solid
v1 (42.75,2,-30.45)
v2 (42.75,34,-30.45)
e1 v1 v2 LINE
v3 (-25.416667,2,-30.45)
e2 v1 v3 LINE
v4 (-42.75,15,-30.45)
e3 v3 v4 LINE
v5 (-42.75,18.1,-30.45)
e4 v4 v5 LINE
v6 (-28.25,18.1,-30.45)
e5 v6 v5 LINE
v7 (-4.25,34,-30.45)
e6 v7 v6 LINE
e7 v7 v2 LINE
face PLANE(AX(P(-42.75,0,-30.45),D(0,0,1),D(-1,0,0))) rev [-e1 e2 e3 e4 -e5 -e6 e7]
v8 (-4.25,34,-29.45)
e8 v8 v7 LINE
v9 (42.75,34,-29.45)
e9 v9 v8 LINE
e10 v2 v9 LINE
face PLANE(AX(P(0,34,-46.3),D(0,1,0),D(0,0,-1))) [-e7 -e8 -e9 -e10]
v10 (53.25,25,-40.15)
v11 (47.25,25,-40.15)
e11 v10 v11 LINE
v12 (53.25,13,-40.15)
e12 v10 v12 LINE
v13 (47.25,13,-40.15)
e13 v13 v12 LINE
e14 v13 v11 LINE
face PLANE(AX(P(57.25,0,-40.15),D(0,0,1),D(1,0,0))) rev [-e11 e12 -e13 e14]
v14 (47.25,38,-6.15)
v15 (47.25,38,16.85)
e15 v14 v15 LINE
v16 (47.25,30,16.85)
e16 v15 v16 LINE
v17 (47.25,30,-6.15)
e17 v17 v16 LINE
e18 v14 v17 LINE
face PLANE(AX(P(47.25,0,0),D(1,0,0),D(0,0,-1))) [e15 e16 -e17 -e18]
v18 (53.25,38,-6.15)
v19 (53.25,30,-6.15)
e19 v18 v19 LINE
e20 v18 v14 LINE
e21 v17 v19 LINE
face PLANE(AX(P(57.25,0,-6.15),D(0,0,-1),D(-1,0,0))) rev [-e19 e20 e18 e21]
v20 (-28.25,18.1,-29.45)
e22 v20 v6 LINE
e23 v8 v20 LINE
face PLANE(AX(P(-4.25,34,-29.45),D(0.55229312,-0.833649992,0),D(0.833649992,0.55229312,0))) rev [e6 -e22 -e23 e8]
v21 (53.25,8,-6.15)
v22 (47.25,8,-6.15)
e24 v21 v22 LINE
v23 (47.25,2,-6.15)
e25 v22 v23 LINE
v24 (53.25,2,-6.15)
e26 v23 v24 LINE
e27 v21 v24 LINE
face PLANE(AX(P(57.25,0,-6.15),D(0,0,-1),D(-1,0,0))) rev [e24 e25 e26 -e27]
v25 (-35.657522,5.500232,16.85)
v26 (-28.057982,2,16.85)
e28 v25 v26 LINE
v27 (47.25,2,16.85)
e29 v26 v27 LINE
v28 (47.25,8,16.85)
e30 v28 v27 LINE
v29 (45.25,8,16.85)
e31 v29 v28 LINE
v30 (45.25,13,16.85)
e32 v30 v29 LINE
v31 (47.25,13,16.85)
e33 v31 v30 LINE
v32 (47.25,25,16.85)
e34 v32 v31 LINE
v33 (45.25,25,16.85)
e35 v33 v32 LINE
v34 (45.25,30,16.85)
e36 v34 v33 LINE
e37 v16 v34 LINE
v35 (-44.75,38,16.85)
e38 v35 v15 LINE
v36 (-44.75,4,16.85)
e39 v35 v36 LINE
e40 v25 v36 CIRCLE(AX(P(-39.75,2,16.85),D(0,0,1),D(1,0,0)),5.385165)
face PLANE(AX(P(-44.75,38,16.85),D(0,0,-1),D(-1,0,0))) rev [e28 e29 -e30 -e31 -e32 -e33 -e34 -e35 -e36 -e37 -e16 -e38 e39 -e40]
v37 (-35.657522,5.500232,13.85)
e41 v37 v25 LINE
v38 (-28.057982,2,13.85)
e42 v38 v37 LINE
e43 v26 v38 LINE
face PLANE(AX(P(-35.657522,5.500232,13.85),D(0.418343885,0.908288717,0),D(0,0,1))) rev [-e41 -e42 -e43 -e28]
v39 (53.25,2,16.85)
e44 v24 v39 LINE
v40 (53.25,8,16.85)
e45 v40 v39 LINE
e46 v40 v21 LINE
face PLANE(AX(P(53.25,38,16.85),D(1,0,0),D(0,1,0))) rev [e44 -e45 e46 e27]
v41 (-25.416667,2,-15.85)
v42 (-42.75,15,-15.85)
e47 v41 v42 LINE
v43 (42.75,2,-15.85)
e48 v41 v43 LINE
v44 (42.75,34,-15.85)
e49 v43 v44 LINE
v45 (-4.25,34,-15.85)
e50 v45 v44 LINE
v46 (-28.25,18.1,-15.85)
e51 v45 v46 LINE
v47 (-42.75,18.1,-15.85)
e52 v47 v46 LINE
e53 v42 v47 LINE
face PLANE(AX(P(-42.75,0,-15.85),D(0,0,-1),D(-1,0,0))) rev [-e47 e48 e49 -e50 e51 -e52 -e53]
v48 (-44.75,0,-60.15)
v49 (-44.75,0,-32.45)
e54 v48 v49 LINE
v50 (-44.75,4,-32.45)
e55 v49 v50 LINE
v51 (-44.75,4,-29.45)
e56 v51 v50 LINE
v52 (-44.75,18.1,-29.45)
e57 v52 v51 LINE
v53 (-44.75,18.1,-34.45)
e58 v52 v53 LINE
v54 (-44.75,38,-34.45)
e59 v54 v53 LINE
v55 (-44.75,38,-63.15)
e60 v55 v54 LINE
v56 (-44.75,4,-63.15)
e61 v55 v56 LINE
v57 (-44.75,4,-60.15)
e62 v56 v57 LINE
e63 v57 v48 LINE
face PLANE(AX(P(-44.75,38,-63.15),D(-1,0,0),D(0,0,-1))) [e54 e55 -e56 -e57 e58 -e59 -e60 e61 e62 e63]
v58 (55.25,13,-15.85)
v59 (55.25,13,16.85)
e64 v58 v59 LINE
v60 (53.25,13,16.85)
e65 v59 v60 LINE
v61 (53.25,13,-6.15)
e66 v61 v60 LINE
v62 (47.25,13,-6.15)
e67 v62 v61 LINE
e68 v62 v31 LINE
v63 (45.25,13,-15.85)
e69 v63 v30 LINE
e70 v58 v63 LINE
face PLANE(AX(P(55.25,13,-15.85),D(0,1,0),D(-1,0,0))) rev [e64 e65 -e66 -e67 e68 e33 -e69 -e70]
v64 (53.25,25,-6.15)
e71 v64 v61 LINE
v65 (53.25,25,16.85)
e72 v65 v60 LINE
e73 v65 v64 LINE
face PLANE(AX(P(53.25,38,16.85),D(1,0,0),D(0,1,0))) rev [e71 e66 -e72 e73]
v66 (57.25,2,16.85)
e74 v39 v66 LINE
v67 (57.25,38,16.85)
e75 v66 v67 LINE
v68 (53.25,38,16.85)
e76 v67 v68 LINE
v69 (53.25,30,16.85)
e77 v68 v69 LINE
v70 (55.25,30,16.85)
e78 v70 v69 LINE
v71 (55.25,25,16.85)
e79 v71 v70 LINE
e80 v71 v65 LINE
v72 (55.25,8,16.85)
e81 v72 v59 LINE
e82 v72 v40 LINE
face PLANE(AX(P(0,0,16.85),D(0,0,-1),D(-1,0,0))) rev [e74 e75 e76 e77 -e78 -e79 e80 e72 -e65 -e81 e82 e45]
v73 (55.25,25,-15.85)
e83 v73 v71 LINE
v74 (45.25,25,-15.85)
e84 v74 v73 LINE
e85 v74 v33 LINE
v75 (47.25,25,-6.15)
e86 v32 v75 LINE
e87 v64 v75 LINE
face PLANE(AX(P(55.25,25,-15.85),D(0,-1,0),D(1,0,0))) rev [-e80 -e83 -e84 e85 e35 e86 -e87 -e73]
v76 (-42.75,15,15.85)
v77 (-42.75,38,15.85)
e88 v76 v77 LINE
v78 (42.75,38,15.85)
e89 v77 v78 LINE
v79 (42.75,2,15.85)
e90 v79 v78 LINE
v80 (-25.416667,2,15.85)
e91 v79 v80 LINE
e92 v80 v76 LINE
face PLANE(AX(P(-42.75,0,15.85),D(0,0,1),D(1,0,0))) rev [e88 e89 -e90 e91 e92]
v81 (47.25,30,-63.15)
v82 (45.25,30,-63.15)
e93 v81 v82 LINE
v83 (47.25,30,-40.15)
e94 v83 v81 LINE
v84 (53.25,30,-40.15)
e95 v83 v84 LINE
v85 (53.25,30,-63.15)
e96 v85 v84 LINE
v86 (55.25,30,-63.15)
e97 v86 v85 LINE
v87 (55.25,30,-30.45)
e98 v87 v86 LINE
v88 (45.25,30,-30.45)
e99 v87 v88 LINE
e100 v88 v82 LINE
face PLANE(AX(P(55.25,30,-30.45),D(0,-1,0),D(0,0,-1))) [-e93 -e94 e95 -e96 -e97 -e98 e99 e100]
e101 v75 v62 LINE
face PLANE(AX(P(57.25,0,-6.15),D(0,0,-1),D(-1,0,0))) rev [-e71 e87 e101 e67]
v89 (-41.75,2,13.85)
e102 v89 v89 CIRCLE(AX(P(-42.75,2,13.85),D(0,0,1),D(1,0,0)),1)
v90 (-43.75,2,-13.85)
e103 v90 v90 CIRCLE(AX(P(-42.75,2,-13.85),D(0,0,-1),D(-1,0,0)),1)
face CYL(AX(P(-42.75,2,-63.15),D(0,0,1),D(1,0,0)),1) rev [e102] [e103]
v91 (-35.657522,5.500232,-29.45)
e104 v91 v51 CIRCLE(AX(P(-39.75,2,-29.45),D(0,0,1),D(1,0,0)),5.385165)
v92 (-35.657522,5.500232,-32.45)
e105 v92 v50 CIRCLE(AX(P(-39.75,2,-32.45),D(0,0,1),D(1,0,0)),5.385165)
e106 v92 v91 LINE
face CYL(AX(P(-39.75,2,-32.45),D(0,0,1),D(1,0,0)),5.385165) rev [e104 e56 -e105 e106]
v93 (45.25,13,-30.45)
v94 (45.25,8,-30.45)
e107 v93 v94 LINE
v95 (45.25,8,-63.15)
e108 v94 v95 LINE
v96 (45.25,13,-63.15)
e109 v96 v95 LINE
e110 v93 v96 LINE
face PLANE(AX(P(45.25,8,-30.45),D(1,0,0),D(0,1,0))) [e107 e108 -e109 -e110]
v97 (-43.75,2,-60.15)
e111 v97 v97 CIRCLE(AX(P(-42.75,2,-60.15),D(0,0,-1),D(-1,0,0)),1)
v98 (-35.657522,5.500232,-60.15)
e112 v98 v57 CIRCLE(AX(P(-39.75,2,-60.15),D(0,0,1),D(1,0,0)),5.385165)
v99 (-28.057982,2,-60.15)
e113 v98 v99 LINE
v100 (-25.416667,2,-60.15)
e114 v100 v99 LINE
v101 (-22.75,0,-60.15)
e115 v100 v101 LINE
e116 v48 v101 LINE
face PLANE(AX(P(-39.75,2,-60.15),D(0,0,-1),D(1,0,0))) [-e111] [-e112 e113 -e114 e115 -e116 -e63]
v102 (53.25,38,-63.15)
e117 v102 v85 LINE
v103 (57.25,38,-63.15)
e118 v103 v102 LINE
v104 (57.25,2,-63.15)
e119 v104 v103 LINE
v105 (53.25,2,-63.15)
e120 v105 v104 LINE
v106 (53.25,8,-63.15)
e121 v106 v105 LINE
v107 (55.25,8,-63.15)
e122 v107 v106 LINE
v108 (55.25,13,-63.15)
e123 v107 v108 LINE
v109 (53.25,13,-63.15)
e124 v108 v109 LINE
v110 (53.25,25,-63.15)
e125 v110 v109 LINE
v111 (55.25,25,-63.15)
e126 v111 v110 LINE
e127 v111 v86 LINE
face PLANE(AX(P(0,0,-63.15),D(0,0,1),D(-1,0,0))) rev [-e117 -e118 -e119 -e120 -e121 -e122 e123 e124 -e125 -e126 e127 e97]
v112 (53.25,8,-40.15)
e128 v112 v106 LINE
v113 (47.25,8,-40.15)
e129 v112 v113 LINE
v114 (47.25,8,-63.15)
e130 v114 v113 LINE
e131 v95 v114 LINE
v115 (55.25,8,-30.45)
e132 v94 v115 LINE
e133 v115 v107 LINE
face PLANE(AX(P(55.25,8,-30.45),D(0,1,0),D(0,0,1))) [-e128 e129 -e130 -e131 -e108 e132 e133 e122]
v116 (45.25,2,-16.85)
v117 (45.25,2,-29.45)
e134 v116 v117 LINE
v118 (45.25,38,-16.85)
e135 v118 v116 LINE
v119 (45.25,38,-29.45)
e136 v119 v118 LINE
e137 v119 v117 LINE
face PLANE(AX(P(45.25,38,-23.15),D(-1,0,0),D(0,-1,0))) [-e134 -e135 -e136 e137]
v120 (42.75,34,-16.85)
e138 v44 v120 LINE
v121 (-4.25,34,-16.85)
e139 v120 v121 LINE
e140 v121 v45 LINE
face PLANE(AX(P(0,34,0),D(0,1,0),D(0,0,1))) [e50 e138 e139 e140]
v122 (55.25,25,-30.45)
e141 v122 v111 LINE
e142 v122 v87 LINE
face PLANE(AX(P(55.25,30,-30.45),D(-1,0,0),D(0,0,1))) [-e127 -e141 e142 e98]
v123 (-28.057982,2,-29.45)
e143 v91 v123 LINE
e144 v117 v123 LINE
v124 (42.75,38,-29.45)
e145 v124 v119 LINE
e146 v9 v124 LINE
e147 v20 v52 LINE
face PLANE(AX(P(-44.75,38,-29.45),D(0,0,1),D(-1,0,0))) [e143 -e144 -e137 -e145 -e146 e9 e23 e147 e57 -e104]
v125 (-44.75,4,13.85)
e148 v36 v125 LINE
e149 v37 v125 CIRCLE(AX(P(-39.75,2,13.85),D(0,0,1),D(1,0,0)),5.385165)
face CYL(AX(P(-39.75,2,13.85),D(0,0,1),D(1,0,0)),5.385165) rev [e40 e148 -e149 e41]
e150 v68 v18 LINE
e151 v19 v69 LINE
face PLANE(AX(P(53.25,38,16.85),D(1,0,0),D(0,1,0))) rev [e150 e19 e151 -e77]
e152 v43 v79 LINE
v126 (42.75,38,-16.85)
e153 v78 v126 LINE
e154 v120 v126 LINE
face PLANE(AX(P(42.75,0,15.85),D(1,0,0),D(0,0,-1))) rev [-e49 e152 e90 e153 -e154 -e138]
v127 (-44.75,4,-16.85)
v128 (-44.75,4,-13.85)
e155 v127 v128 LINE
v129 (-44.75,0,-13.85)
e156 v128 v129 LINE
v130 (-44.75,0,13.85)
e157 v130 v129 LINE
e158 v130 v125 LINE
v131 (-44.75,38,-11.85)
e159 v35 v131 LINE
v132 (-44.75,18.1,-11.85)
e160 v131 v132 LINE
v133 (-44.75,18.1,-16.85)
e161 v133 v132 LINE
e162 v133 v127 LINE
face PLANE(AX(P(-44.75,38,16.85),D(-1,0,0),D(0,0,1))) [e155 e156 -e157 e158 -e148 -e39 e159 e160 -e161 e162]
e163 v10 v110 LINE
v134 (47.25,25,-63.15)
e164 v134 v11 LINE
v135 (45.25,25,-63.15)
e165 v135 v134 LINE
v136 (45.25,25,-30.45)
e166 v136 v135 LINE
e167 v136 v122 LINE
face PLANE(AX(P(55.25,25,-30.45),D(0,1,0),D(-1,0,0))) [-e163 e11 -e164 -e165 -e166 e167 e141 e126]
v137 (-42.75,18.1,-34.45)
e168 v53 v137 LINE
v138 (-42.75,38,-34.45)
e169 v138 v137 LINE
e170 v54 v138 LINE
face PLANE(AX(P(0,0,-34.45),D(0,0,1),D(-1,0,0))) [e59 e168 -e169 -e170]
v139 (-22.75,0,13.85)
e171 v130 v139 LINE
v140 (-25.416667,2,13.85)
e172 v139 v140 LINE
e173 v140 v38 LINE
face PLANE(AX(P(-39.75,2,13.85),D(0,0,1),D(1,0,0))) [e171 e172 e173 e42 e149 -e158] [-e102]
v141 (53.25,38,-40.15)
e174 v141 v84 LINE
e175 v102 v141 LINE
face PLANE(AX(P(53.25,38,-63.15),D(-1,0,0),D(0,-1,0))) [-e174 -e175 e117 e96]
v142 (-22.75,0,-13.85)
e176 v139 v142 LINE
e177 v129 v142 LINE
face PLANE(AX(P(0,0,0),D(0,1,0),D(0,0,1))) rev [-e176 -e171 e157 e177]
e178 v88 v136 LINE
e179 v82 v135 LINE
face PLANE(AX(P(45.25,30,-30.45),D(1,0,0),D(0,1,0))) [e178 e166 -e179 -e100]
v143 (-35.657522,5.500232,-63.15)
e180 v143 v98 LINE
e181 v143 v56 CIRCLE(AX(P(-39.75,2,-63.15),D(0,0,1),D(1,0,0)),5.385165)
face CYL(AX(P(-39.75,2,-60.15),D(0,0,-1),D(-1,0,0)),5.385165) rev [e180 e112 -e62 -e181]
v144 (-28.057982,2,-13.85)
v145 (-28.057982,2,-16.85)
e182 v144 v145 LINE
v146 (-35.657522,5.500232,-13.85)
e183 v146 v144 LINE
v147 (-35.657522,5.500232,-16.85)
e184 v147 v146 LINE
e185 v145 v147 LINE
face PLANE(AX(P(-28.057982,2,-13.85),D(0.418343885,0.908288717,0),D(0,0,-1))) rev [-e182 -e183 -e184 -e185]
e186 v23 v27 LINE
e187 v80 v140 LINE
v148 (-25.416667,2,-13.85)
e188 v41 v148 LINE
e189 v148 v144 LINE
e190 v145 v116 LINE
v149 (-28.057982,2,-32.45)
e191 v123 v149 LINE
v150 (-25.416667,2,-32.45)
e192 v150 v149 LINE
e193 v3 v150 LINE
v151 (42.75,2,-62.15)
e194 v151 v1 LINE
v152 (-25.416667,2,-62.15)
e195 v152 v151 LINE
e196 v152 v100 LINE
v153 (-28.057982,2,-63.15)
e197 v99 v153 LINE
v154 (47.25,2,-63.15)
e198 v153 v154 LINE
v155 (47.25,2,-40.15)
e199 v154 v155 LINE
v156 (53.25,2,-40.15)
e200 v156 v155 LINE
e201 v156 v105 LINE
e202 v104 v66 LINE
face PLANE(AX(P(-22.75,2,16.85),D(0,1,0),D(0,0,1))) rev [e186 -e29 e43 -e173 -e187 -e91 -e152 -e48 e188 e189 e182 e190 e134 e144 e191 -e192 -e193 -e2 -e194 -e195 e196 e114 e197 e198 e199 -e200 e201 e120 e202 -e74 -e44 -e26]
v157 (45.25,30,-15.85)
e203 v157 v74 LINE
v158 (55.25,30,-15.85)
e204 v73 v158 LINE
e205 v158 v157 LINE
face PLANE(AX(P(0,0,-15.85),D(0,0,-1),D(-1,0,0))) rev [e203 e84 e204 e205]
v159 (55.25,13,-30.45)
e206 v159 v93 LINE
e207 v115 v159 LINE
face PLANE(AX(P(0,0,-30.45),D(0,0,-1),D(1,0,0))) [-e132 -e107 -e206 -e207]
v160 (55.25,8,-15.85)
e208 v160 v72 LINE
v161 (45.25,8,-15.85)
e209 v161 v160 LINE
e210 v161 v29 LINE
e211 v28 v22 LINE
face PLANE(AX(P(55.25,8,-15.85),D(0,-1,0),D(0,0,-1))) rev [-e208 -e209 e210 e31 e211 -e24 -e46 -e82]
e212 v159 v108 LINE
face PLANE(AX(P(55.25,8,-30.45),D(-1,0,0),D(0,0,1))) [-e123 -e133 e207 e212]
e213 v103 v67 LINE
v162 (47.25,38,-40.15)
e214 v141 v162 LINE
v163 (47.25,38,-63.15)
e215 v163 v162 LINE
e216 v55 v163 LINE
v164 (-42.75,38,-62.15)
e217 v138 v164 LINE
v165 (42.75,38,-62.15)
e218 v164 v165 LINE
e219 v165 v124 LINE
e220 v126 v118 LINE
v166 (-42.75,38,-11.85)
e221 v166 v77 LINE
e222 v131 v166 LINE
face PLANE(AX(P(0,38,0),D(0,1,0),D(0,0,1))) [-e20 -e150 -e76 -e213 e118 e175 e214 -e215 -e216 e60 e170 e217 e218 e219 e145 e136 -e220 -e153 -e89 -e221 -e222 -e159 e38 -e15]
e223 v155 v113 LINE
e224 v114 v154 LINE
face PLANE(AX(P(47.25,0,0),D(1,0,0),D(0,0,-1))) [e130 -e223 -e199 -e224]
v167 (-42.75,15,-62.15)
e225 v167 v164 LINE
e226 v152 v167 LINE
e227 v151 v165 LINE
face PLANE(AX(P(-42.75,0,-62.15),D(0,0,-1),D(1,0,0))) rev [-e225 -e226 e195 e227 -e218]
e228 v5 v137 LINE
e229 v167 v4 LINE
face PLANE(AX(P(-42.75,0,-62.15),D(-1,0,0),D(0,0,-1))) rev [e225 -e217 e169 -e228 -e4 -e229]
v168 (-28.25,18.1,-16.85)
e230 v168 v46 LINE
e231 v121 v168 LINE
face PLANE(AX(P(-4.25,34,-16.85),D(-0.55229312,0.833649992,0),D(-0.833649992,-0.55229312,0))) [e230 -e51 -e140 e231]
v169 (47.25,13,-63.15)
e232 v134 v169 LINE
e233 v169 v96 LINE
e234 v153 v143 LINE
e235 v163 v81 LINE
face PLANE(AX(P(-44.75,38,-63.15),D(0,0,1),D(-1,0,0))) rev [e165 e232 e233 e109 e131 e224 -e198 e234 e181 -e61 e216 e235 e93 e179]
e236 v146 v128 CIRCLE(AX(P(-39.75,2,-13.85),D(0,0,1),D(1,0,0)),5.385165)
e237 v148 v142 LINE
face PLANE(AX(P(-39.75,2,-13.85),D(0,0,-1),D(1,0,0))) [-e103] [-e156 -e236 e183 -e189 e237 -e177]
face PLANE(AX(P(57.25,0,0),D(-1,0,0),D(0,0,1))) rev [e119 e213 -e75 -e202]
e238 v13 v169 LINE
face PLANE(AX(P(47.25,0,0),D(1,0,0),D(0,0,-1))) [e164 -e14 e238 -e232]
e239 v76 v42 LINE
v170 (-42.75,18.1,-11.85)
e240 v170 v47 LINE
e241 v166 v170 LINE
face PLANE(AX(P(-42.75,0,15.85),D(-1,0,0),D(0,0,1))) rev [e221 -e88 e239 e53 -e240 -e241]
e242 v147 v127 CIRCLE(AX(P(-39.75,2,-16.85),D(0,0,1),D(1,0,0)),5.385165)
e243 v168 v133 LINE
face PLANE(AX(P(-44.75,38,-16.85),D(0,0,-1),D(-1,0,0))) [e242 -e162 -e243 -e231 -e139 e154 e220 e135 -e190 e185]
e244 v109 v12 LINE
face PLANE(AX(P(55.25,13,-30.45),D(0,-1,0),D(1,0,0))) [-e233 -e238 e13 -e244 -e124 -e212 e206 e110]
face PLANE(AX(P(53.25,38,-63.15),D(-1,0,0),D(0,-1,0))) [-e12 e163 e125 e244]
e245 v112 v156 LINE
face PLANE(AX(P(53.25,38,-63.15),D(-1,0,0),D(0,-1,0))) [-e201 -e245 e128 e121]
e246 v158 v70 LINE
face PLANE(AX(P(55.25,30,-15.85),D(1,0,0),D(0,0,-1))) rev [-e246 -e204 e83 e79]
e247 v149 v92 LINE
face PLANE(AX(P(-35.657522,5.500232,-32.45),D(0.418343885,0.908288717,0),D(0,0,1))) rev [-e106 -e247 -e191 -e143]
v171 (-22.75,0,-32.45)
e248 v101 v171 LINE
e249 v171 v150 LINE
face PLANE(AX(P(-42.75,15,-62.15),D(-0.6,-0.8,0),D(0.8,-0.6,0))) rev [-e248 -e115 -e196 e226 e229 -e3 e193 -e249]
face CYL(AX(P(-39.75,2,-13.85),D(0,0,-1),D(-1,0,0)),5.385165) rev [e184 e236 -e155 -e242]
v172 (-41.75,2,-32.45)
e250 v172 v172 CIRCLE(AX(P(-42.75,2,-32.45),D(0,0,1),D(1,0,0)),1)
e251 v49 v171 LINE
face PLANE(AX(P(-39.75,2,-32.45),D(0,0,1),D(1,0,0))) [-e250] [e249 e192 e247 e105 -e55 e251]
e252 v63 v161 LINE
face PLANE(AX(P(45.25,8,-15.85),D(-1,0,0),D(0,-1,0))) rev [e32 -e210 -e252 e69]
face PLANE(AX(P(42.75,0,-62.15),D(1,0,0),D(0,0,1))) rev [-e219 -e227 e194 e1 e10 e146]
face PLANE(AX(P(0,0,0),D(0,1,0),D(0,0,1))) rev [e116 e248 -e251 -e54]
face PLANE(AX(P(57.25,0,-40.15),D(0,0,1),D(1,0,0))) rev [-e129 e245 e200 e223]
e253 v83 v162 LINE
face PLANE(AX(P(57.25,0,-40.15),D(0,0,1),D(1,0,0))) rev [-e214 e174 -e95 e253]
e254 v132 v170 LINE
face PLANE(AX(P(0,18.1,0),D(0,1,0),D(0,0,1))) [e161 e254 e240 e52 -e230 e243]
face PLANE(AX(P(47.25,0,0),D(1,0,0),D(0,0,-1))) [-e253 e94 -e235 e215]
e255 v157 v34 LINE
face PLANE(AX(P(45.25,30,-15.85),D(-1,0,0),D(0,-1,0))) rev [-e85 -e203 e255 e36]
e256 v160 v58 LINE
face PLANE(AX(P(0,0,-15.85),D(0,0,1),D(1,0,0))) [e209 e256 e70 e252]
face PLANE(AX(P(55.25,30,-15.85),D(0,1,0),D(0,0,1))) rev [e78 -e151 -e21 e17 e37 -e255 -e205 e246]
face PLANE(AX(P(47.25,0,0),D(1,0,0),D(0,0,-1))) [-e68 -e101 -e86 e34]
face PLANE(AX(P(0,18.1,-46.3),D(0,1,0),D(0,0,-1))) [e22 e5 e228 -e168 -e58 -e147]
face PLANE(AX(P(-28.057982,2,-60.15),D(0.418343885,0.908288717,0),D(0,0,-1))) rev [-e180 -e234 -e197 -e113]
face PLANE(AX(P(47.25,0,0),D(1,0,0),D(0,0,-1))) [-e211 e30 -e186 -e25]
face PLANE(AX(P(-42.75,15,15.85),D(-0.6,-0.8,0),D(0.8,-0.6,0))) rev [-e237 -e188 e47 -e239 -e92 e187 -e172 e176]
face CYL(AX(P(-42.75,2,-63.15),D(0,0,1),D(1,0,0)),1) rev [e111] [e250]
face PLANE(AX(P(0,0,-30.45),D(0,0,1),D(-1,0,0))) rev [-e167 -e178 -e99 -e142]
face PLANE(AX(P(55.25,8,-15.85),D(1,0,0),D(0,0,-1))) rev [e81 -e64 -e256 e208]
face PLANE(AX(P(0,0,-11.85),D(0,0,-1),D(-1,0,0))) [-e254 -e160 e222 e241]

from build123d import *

# Parameters (mm, degrees)
SKETCH2_W            = 89.5
SKETCH2_H            = 33.7
BOSS_EXTRUDE1_DEPTH  = 38
SKETCH3_W            = 85.5
SKETCH3_H            = 31.7
CUT_EXTRUDE1_DEPTH   = 38
BOSS_EXTRUDE2_DEPTH  = 31.7
SKETCH5_W            = 33.7
SKETCH5_H            = 38
BOSS_EXTRUDE3_DEPTH  = 2.5
SKETCH6_W            = 2
SKETCH6_H            = 38
BOSS_EXTRUDE4_DEPTH  = 6.3
SKETCH7_W            = 34
SKETCH7_H            = 38
BOSS_EXTRUDE5_DEPTH  = 10
SKETCH8_W            = 4
SKETCH8_H            = 38
BOSS_EXTRUDE6_DEPTH  = 23
CUT_EXTRUDE2_START   = -32.7
SKETCH9_W            = 10
SKETCH9_H            = 5
CUT_EXTRUDE2_DEPTH   = 32.7
SKETCH11_W           = 80
SKETCH11_H           = 2
CUT_EXTRUDE3_DEPTH   = 80
CUT_EXTRUDE4_DEPTH   = 3
MIRROR4_COPY_1_DEPTH = 3
CUT_EXTRUDE5_START   = -74
SKETCH13_R           = 1
CUT_EXTRUDE5_DEPTH   = 74
SKETCH15_W           = 47
SKETCH15_H           = 1
CUT_EXTRUDE6_DEPTH   = 4
SKETCH16_W           = 40.5
SKETCH16_H           = 2
CUT_EXTRUDE7_DEPTH   = 19.9
SKETCH17_W           = 2
SKETCH17_H           = 19.9
CUT_EXTRUDE8_DEPTH   = 3
BOSS_EXTRUDE7_START  = -1
BOSS_EXTRUDE7_DEPTH  = 1


with BuildPart() as part:
    # Sketch2 → Boss-Extrude1 (new body)
    with BuildSketch(Plane(origin=(0, 0, 0), x_dir=(1, 0, 0), z_dir=(0, 1, 0))):
        Rectangle(SKETCH2_W, SKETCH2_H)
    extrude(amount=BOSS_EXTRUDE1_DEPTH)

    # Sketch3 → Cut-Extrude1 (cut)
    with BuildSketch(Plane(origin=(0, 38, 0), x_dir=(1, 0, 0), z_dir=(0, 1, 0))):
        Rectangle(SKETCH3_W, SKETCH3_H)
    extrude(amount=-CUT_EXTRUDE1_DEPTH, mode=Mode.SUBTRACT)

    # Sketch4 → Boss-Extrude2 (add)
    with BuildSketch(Plane.XY.offset(-15.85)):
        Polygon((-42.75, 0), (-42.75, 15), (-22.75, 0), align=None)
    extrude(amount=BOSS_EXTRUDE2_DEPTH)

    # Sketch5 → Boss-Extrude3 (add)
    with BuildSketch(Plane(origin=(44.75, 0, 0), x_dir=(0, 0, -1), z_dir=(1, 0, 0))):
        with Locations((0, 19)):
            Rectangle(SKETCH5_W, SKETCH5_H)
    extrude(amount=BOSS_EXTRUDE3_DEPTH)

    # Sketch6 → Boss-Extrude4 (add)
    with BuildSketch(Plane(origin=(0, 0, -16.85), x_dir=(-1, 0, 0), z_dir=(0, 0, -1))):
        with Locations((-46.25, 19)):
            Rectangle(SKETCH6_W, SKETCH6_H)
    extrude(amount=BOSS_EXTRUDE4_DEPTH)

    # Mirror1: part across plane


with BuildPart() as part_1:
    add(part.part)
    add(part.part.mirror(Plane(origin=(0, 0, -23.15), x_dir=(1, 0, 0), z_dir=(0, 0, -1))))

    # Sketch7 → Boss-Extrude5 (add)
    with BuildSketch(Plane(origin=(47.25, 0, 0), x_dir=(0, 0, -1), z_dir=(1, 0, 0))):
        with Locations((23.15, 19)):
            Rectangle(SKETCH7_W, SKETCH7_H)
    extrude(amount=BOSS_EXTRUDE5_DEPTH)

    # Sketch8 → Boss-Extrude6 (add)
    with BuildSketch(Plane.XY.offset(-6.15)):
        with Locations((55.25, 19)):
            Rectangle(SKETCH8_W, SKETCH8_H)
    boss_extrude6 = extrude(amount=BOSS_EXTRUDE6_DEPTH)

    # Sketch9 → Cut-Extrude2 (cut)
    with BuildSketch(Plane.XY.offset(16.85).offset(CUT_EXTRUDE2_START)):
        with Locations((50.25, 27.5)):
            Rectangle(SKETCH9_W, SKETCH9_H)
        with Locations((50.25, 10.5)):
            Rectangle(SKETCH9_W, SKETCH9_H)
    cut_extrude2 = extrude(amount=CUT_EXTRUDE2_DEPTH, mode=Mode.SUBTRACT)

    # Mirror2: Boss-Extrude6, Cut-Extrude2 across plane
    add(boss_extrude6.mirror(Plane(origin=(0, 0, -23.15), x_dir=(1, 0, 0), z_dir=(0, 0, -1))))
    add(cut_extrude2.mirror(Plane(origin=(0, 0, -23.15), x_dir=(1, 0, 0), z_dir=(0, 0, -1))), mode=Mode.SUBTRACT)

    # Sketch11 → Cut-Extrude3 (cut)
    with BuildSketch(Plane(origin=(57.25, 0, 0), x_dir=(0, 0, -1), z_dir=(1, 0, 0))):
        with Locations((23.15, 1)):
            Rectangle(SKETCH11_W, SKETCH11_H)
    extrude(amount=-CUT_EXTRUDE3_DEPTH, mode=Mode.SUBTRACT)

    # Sketch12 → Cut-Extrude4 (cut)
    with BuildSketch(Plane.XY.offset(16.85)):
        with BuildLine():
            Line((-22.75, 2), (-34.364835193, 2))
            ThreePointArc((-34.364835193, 2), (-40.768375168, 7.287996976), (-44.75, 0))
            Line((-44.75, 0), (-22.75, 0))
            Line((-22.75, 0), (-22.75, 2))
        make_face()
    cut_extrude4 = extrude(amount=-CUT_EXTRUDE4_DEPTH, mode=Mode.SUBTRACT)

    # Mirror3: Cut-Extrude4 across plane
    add(cut_extrude4.mirror(Plane.XY), mode=Mode.SUBTRACT)

    # Mirror4: Cut-Extrude4 across plane
    add(cut_extrude4.mirror(Plane(origin=(0, 0, -23.15), x_dir=(1, 0, 0), z_dir=(0, 0, -1))), mode=Mode.SUBTRACT)

    # Mirror4 copy 1 sketch → Mirror4 copy 1 (cut)
    with BuildSketch(Plane.XY.offset(-29.45)):
        with BuildLine():
            Line((-22.75, 2), (-34.364835193, 2))
            ThreePointArc((-34.364835193, 2), (-40.768375168, 7.287996976), (-44.75, 0))
            Line((-44.75, 0), (-22.75, 0))
            Line((-22.75, 0), (-22.75, 2))
        make_face()
    extrude(amount=-MIRROR4_COPY_1_DEPTH, mode=Mode.SUBTRACT)

    # Sketch13 → Cut-Extrude5 (cut)
    with BuildSketch(Plane.XY.offset(13.85).offset(CUT_EXTRUDE5_START)):
        with Locations((-42.75, 2)):
            Circle(SKETCH13_R)
    extrude(amount=CUT_EXTRUDE5_DEPTH, mode=Mode.SUBTRACT)

    # Chamfer1
    # the kernel refuses this chamfer: 10 mm, written as the material it takes off along each edge
    with BuildSketch(Plane(origin=(-34.364835193, 2, 33.530669666), x_dir=(-0.4115208033655663, 0.9114003666870882, 0), z_dir=(0, 0, -1))) as chamfer1_piece_1:
        with BuildLine():
            Line((4.024103798, 0), (-2.897424879, 6.010331734))
            Line((-2.897424879, 6.010331734), (-3.079704953, 5.928027573))
            ThreePointArc((-3.079704953, 5.928027573), (-1.554736759, 2.957293148), (-0.182280073, -0.082304161))
            Line((-0.182280073, -0.082304161), (0.082304161, -0.182280073))
            ThreePointArc((0.082304161, -0.182280073), (2.000716354, 0.27264804), (3.968173362, -0.192020276))
            Line((3.968173362, -0.192020276), (4.024103798, 0))
        make_face()
    extrude(amount=19.680669666, mode=Mode.SUBTRACT)

    # Chamfer2
    # the kernel refuses this chamfer: 10 mm, written as the material it takes off along each edge
    with BuildSketch(Plane(origin=(-34.364835193, 2, -33.530669666), x_dir=(0.9996854583228201, -0.025079561756403367, 0), z_dir=(0, 0, 1))) as chamfer2_piece_1_section:
        with BuildLine():
            Line((6.304869905, 0.158173126), (-1.380064624, 3.466711132))
            ThreePointArc((-1.380064624, 3.466711132), (-0.439598609, 1.999919309), (0, 0))
            Line((0, 0), (6.304869905, 0.158173126))
        make_face()
    chamfer2_piece_1 = extrude(amount=19.680669666, mode=Mode.PRIVATE)
    chamfer2_piece_1 = split(chamfer2_piece_1, bisect_by=Plane(origin=(-32.514060805, 3.115216655, -29.45), z_dir=(0, 0, 1)), keep=Keep.TOP, mode=Mode.PRIVATE)
    add(chamfer2_piece_1, mode=Mode.SUBTRACT)

    # Chamfer3
    # the kernel refuses this chamfer: 10 mm, written as the material it takes off along each edge
    with BuildSketch(Plane(origin=(-34.364835193, 2, -12.769330334), x_dir=(-0.4115208033655663, 0.9114003666870882, 0), z_dir=(0, 0, -1))) as chamfer3_piece_1_section:
        with BuildLine():
            Line((4.024103798, 0), (-2.897424879, 6.010331734))
            Line((-2.897424879, 6.010331734), (-3.079704953, 5.928027573))
            ThreePointArc((-3.079704953, 5.928027573), (-1.554736759, 2.957293148), (-0.182280073, -0.082304161))
            Line((-0.182280073, -0.082304161), (0.082304161, -0.182280073))
            ThreePointArc((0.082304161, -0.182280073), (2.000716354, 0.27264804), (3.968173362, -0.192020276))
            Line((3.968173362, -0.192020276), (4.024103798, 0))
        make_face()
    chamfer3_piece_1 = extrude(amount=19.680669666, mode=Mode.PRIVATE)
    chamfer3_piece_1 = split(chamfer3_piece_1, bisect_by=Plane(origin=(-32.482113907, 3.03712607, -13.85), z_dir=(0, 0, -1)), keep=Keep.TOP, mode=Mode.PRIVATE)
    add(chamfer3_piece_1, mode=Mode.SUBTRACT)

    # Chamfer4
    # the kernel refuses this chamfer: 10 mm, written as the material it takes off along each edge
    with BuildSketch(Plane(origin=(-34.364835193, 2, -79.830669666), x_dir=(0.9996854583228201, -0.025079561756403367, 0), z_dir=(0, 0, 1))) as chamfer4_piece_1:
        with BuildLine():
            Line((6.672267866, 0), (-1.747462586, 3.624884258))
            Line((-1.747462586, 3.624884258), (-1.896145364, 3.491117927))
            ThreePointArc((-1.896145364, 3.491117927), (-0.623209418, 1.920628258), (-0.199937092, -0.005015912))
            Line((-0.199937092, -0.005015912), (0.005015912, -0.199937092))
            ThreePointArc((0.005015912, -0.199937092), (3.339051469, -0.116294632), (6.677283779, -0.199937092))
            Line((6.677283779, -0.199937092), (6.672267866, 0))
        make_face()
    extrude(amount=19.680669666, mode=Mode.SUBTRACT)

    # Sketch15 → Cut-Extrude6 (cut)
    with BuildSketch(Plane(origin=(0, 38, 0), x_dir=(1, 0, 0), z_dir=(0, 1, 0))):
        with Locations((19.25, 16.35)):
            Rectangle(SKETCH15_W, SKETCH15_H)
    cut_extrude6 = extrude(amount=-CUT_EXTRUDE6_DEPTH, mode=Mode.SUBTRACT)

    # Sketch16 → Cut-Extrude7 (cut)
    with BuildSketch(Plane(origin=(0, 38, 0), x_dir=(1, 0, 0), z_dir=(0, 1, 0))):
        with Locations((-24.5, 15.85)):
            Rectangle(SKETCH16_W, SKETCH16_H)
    cut_extrude7 = extrude(amount=-CUT_EXTRUDE7_DEPTH, mode=Mode.SUBTRACT)

    # Sketch17 → Cut-Extrude8 (cut)
    with BuildSketch(Plane(origin=(0, 0, -14.85), x_dir=(-1, 0, 0), z_dir=(0, 0, -1))):
        with Locations((43.75, 28.05)):
            Rectangle(SKETCH17_W, SKETCH17_H)
    cut_extrude8 = extrude(amount=-CUT_EXTRUDE8_DEPTH, mode=Mode.SUBTRACT)

    # Sketch18 → Boss-Extrude7 (add)
    with BuildSketch(Plane.XY.offset(-15.85).offset(BOSS_EXTRUDE7_START)):
        Polygon((-4.25, 18.1), (-4.25, 34), (-28.25, 18.1), align=None)
    boss_extrude7 = extrude(amount=BOSS_EXTRUDE7_DEPTH)

    # Mirror5: Cut-Extrude6, Cut-Extrude7, Cut-Extrude8, Boss-Extrude7 across plane
    add(cut_extrude6.mirror(Plane(origin=(0, 0, -23.15), x_dir=(1, 0, 0), z_dir=(0, 0, -1))), mode=Mode.SUBTRACT)
    add(cut_extrude7.mirror(Plane(origin=(0, 0, -23.15), x_dir=(1, 0, 0), z_dir=(0, 0, -1))), mode=Mode.SUBTRACT)
    add(cut_extrude8.mirror(Plane(origin=(0, 0, -23.15), x_dir=(1, 0, 0), z_dir=(0, 0, -1))), mode=Mode.SUBTRACT)
    add(boss_extrude7.mirror(Plane(origin=(0, 0, -23.15), x_dir=(1, 0, 0), z_dir=(0, 0, -1))))


solid = part_1.part
